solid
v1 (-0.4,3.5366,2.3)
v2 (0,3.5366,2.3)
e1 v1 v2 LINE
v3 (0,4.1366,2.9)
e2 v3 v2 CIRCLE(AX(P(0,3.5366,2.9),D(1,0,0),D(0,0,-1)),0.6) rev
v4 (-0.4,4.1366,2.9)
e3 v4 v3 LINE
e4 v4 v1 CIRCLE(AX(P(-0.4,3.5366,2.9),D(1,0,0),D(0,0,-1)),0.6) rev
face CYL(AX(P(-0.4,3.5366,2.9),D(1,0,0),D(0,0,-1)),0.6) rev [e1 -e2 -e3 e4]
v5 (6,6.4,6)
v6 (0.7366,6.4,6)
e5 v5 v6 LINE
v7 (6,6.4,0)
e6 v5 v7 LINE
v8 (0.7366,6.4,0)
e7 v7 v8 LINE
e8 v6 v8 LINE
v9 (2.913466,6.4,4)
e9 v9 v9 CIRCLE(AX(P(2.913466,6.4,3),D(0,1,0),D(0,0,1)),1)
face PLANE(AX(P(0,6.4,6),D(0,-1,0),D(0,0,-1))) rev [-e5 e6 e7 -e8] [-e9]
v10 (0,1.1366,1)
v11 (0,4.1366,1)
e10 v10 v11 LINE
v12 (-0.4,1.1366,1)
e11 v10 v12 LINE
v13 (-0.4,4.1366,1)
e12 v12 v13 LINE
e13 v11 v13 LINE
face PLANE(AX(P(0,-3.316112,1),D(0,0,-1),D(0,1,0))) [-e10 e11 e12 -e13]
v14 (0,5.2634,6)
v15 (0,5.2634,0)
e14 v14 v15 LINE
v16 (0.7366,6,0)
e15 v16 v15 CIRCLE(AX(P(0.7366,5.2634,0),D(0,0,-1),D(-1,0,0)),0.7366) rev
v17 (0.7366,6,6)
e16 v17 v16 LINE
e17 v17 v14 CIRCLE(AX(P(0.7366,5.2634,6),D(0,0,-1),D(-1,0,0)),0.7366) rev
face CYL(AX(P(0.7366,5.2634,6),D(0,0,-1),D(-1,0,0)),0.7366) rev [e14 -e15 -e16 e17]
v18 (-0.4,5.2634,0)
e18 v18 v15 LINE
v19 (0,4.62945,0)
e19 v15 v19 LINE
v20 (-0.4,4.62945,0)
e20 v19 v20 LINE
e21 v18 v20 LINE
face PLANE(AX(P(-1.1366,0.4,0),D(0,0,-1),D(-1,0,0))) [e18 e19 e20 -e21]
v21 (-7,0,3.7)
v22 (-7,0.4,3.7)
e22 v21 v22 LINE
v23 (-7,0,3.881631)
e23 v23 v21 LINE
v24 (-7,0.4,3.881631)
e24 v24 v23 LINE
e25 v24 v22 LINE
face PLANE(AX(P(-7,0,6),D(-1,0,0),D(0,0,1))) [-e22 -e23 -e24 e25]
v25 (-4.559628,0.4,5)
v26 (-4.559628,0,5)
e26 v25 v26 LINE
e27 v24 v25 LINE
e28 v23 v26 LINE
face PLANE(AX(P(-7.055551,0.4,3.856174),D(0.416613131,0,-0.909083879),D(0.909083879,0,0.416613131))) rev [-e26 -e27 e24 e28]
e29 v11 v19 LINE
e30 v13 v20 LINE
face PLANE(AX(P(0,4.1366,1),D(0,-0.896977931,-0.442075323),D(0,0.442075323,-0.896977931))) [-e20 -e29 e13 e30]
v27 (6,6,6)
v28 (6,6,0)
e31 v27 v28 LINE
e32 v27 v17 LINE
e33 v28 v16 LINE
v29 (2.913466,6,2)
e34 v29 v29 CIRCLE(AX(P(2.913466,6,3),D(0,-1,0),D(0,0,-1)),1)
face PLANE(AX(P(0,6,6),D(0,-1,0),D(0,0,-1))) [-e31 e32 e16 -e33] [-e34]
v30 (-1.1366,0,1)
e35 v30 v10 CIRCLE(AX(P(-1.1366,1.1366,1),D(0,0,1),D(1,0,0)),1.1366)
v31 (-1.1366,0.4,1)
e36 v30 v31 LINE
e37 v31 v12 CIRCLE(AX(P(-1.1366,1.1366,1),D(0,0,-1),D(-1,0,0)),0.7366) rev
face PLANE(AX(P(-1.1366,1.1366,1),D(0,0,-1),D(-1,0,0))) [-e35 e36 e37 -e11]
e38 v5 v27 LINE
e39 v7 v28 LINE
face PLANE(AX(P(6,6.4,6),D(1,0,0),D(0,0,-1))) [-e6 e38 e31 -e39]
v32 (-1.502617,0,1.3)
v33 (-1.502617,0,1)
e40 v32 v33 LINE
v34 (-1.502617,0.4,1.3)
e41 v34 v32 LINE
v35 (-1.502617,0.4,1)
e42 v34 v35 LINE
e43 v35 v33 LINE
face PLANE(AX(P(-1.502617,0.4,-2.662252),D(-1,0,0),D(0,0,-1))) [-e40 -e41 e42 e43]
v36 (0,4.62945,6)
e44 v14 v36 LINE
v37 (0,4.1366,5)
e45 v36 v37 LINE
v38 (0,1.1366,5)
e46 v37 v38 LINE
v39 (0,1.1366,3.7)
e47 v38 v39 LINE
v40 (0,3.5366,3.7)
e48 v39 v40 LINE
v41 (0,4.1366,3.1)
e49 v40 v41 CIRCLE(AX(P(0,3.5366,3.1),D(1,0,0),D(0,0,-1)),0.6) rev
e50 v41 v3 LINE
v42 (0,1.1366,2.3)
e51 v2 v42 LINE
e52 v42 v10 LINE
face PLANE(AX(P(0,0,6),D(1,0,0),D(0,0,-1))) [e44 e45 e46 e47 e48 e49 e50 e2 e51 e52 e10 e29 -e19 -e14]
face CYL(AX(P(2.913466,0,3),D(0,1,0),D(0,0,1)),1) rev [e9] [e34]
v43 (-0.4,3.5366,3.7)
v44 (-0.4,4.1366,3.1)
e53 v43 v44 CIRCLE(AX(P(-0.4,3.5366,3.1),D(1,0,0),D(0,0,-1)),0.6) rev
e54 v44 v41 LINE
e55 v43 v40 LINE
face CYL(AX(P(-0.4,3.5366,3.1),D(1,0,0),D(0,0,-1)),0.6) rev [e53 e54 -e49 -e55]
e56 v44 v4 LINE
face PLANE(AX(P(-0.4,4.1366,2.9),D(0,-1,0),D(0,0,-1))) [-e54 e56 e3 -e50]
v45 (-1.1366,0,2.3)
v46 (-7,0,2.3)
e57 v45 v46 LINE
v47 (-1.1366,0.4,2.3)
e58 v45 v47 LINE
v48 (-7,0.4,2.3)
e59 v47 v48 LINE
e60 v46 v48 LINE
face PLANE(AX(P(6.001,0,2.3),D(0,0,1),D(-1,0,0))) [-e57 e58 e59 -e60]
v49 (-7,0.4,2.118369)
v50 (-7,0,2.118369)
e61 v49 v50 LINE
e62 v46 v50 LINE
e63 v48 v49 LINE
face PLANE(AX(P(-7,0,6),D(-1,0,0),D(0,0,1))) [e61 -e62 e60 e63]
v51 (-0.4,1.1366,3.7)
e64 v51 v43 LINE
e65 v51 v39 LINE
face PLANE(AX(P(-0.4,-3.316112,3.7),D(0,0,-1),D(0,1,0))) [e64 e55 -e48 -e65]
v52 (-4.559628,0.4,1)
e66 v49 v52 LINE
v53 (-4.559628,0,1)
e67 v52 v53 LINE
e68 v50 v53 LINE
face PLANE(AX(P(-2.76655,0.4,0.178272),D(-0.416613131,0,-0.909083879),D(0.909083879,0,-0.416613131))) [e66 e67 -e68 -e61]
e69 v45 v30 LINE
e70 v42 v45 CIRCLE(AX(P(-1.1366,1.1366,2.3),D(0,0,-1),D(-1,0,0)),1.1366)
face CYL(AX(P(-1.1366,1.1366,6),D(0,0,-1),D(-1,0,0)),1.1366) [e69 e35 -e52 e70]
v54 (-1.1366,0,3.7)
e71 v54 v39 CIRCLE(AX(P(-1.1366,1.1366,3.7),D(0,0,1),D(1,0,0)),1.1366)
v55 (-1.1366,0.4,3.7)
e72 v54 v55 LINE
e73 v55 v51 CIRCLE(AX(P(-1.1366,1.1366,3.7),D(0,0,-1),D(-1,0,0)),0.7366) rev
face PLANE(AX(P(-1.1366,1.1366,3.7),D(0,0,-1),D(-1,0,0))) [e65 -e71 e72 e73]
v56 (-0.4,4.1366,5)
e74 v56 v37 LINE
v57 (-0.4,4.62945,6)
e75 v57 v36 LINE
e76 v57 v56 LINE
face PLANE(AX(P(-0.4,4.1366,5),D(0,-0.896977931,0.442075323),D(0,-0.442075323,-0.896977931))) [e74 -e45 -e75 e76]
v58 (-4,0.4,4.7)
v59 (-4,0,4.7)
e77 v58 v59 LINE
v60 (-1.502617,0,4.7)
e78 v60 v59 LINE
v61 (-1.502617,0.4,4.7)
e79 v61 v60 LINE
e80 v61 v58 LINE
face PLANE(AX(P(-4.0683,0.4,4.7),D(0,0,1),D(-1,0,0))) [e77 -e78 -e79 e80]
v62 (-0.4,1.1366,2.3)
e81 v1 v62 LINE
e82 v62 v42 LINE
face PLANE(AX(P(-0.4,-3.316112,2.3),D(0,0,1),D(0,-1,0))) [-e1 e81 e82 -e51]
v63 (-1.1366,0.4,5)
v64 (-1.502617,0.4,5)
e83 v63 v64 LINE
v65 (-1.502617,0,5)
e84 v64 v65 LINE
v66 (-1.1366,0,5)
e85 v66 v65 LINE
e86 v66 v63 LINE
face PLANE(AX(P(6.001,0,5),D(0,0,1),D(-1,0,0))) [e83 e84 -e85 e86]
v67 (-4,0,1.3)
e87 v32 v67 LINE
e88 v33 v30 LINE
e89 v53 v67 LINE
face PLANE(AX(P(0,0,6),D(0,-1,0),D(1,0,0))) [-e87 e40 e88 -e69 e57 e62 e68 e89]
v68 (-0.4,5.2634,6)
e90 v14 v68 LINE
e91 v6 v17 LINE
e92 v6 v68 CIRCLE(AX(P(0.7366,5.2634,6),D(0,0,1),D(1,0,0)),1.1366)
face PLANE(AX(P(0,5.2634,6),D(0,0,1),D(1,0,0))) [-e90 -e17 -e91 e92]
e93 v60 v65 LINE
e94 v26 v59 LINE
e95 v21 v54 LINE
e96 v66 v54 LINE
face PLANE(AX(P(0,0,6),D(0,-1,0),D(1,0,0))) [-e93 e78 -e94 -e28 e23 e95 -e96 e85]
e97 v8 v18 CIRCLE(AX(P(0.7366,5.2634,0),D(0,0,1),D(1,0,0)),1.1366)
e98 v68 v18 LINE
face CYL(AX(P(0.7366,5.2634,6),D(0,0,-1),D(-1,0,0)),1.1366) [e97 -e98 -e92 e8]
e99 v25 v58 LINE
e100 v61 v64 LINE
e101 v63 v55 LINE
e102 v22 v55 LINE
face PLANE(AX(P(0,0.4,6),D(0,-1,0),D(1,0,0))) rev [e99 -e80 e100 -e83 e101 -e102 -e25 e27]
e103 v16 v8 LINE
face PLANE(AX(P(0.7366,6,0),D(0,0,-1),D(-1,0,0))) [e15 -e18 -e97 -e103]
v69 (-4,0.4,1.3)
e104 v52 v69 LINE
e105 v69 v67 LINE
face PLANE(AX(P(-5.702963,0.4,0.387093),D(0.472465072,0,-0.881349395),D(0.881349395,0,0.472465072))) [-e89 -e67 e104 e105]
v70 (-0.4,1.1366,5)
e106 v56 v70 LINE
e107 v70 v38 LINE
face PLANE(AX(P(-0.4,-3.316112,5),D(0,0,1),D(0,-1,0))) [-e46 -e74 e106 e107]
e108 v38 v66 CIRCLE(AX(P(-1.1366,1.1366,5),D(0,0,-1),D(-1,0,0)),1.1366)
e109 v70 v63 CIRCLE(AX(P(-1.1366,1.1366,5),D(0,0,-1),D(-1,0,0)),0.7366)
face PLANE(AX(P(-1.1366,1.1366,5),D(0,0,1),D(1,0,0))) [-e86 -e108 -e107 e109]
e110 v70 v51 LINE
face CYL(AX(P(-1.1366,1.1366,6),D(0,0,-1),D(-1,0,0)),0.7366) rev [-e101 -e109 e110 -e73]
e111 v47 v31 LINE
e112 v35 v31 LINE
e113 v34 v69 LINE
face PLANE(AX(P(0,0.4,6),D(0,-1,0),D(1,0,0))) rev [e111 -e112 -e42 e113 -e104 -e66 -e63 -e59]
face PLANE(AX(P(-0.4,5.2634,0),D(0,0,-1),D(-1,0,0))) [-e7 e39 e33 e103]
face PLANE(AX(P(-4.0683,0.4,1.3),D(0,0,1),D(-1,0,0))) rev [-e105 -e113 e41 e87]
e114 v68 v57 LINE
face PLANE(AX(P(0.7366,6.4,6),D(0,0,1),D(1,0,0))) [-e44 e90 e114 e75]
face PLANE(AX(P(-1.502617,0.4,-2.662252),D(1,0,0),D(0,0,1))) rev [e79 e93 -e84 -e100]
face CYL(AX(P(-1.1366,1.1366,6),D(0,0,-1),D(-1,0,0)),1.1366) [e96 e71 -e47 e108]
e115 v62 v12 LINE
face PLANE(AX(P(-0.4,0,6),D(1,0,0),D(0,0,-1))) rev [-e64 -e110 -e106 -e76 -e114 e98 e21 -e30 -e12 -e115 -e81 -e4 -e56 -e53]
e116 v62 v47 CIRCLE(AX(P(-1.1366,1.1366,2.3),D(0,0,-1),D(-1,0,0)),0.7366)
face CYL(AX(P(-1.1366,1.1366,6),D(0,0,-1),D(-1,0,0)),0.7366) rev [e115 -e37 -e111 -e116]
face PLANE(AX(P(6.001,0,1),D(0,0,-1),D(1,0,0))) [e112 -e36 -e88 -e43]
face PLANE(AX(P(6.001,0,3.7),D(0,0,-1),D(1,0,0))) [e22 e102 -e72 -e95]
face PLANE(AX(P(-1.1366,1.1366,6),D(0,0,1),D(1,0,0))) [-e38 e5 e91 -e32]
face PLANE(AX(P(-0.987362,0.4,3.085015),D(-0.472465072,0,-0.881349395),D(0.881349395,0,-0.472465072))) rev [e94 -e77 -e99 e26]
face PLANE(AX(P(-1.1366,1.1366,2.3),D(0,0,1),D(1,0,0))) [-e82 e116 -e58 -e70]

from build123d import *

# Parameters (mm, degrees)
SM_BASE_FLANGE_1_DEPTH = 6
SKETCH_5_R             = 1
CUT_EXTRUDE_1_DEPTH    = 12.223190277
CUT_EXTRUDE_3_REACH    = 17.683
CUT_EXTRUDE_4_REACH    = 13.223


# Sheet-metal steps are written as plain solids
with BuildPart() as part:
    # Sketch 1 → 基体-法兰1 (new body)
    with BuildSketch(Plane.XY):
        with BuildLine():
            Line((-7, 0), (-1.1366, 0))
            ThreePointArc((-1.1366, 0), (-0.332902433, 0.332902433), (0, 1.1366))
            Line((0, 1.1366), (0, 5.2634))
            ThreePointArc((0, 5.2634), (0.215745145, 5.784254855), (0.7366, 6))
            Line((0.7366, 6), (6, 6))
            Line((6, 6), (6, 6.4))
            Line((6, 6.4), (0.7366, 6.4))
            ThreePointArc((0.7366, 6.4), (-0.067097567, 6.067097567), (-0.4, 5.2634))
            Line((-0.4, 5.2634), (-0.4, 1.1366))
            ThreePointArc((-0.4, 1.1366), (-0.615745145, 0.615745145), (-1.1366, 0.4))
            Line((-1.1366, 0.4), (-7, 0.4))
            Line((-7, 0.4), (-7, 0))
        make_face()
    extrude(amount=SM_BASE_FLANGE_1_DEPTH)

    # 草图5 → 切除-拉伸1 (cut, through all)
    with BuildSketch(Plane(origin=(0, 6.4, 0), x_dir=(1, 0, 0), z_dir=(0, 1, 0))):
        with Locations(Location((2.913465792, -3, 0), (0, 0, 270))):
            Circle(SKETCH_5_R)
    extrude(amount=-CUT_EXTRUDE_1_DEPTH, mode=Mode.SUBTRACT)

    # 草图6 → 切除-拉伸3 (cut, up to next)
    with BuildSketch(Plane.ZY.offset(7), mode=Mode.PRIVATE) as cut_extrude_3_sk1:
        with BuildLine():
            Line((2.3, -3.316111615), (2.3, 3.5366))
            ThreePointArc((2.3, 3.5366), (2.475735931, 3.960864069), (2.9, 4.1366))
            Line((2.9, 4.1366), (3, 4.1366))
            Line((3, 4.1366), (3.1, 4.1366))
            ThreePointArc((3.1, 4.1366), (3.524264069, 3.960864069), (3.7, 3.5366))
            Line((3.7, 3.5366), (3.7, -3.316111615))
            Line((3.7, -3.316111615), (2.3, -3.316111615))
        make_face()
    cut_extrude_3_tool1 = extrude(cut_extrude_3_sk1.sketch, amount=-CUT_EXTRUDE_3_REACH, mode=Mode.PRIVATE) & part.part
    # 草图6 → 切除-拉伸3 (cut, up to next)
    with BuildSketch(Plane.ZY.offset(7), mode=Mode.PRIVATE) as cut_extrude_3_sk2:
        Polygon((1, -3.316111615), (1, 4.1366), (0, 4.629449722), (0, -3.316111615), align=None)
    cut_extrude_3_tool2 = extrude(cut_extrude_3_sk2.sketch, amount=-CUT_EXTRUDE_3_REACH, mode=Mode.PRIVATE) & part.part
    # 草图6 → 切除-拉伸3 (cut, up to next)
    with BuildSketch(Plane.ZY.offset(7), mode=Mode.PRIVATE) as cut_extrude_3_sk3:
        Polygon((5, 4.1366), (6, 4.629449722), (6, -3.316111615), (5, -3.316111615), align=None)
    cut_extrude_3_tool3 = extrude(cut_extrude_3_sk3.sketch, amount=-CUT_EXTRUDE_3_REACH, mode=Mode.PRIVATE) & part.part
    add(cut_extrude_3_tool1.solids().sort_by_distance((-7, 0.356246, 3))[0], mode=Mode.SUBTRACT)
    add(cut_extrude_3_tool2.solids().sort_by_distance((-7, 0.534771, 0.494666))[0], mode=Mode.SUBTRACT)
    add(cut_extrude_3_tool3.solids().sort_by_distance((-7, 0.534771, 5.505334))[0], mode=Mode.SUBTRACT)

    # 草图7 → 切除-拉伸4 (cut, up to next)
    with BuildSketch(Plane.XZ, mode=Mode.PRIVATE) as cut_extrude_4_sk1:
        Polygon((-7, 3.881631359), (-4.559628285, 5), (-7, 5), align=None)
    cut_extrude_4_tool1 = extrude(cut_extrude_4_sk1.sketch, amount=-CUT_EXTRUDE_4_REACH, mode=Mode.PRIVATE) & part.part
    # 草图7 → 切除-拉伸4 (cut, up to next)
    with BuildSketch(Plane.XZ, mode=Mode.PRIVATE) as cut_extrude_4_sk2:
        Polygon((-1.502616723, 5), (-4, 5), (-4.559628285, 5), (-4, 4.7), (-1.502616723, 4.7), align=None)
    cut_extrude_4_tool2 = extrude(cut_extrude_4_sk2.sketch, amount=-CUT_EXTRUDE_4_REACH, mode=Mode.PRIVATE) & part.part
    # 草图7 → 切除-拉伸4 (cut, up to next)
    with BuildSketch(Plane.XZ, mode=Mode.PRIVATE) as cut_extrude_4_sk3:
        Polygon((-7, 2.118368641), (-7, 1), (-4.559628285, 1), align=None)
    cut_extrude_4_tool3 = extrude(cut_extrude_4_sk3.sketch, amount=-CUT_EXTRUDE_4_REACH, mode=Mode.PRIVATE) & part.part
    # 草图7 → 切除-拉伸4 (cut, up to next)
    with BuildSketch(Plane.XZ, mode=Mode.PRIVATE) as cut_extrude_4_sk4:
        Polygon((-4, 1.3), (-4.559628285, 1), (-4, 1), (-1.502616723, 1), (-1.502616723, 1.3), align=None)
    cut_extrude_4_tool4 = extrude(cut_extrude_4_sk4.sketch, amount=-CUT_EXTRUDE_4_REACH, mode=Mode.PRIVATE) & part.part
    add(cut_extrude_4_tool1.solids().sort_by_distance((-6.186543, 0, 4.62721))[0], mode=Mode.SUBTRACT)
    add(cut_extrude_4_tool2.solids().sort_by_distance((-2.895914, 0, 4.855038))[0], mode=Mode.SUBTRACT)
    add(cut_extrude_4_tool3.solids().sort_by_distance((-6.186543, 0, 1.37279))[0], mode=Mode.SUBTRACT)
    add(cut_extrude_4_tool4.solids().sort_by_distance((-2.895914, 0, 1.144962))[0], mode=Mode.SUBTRACT)


solid = part.part
